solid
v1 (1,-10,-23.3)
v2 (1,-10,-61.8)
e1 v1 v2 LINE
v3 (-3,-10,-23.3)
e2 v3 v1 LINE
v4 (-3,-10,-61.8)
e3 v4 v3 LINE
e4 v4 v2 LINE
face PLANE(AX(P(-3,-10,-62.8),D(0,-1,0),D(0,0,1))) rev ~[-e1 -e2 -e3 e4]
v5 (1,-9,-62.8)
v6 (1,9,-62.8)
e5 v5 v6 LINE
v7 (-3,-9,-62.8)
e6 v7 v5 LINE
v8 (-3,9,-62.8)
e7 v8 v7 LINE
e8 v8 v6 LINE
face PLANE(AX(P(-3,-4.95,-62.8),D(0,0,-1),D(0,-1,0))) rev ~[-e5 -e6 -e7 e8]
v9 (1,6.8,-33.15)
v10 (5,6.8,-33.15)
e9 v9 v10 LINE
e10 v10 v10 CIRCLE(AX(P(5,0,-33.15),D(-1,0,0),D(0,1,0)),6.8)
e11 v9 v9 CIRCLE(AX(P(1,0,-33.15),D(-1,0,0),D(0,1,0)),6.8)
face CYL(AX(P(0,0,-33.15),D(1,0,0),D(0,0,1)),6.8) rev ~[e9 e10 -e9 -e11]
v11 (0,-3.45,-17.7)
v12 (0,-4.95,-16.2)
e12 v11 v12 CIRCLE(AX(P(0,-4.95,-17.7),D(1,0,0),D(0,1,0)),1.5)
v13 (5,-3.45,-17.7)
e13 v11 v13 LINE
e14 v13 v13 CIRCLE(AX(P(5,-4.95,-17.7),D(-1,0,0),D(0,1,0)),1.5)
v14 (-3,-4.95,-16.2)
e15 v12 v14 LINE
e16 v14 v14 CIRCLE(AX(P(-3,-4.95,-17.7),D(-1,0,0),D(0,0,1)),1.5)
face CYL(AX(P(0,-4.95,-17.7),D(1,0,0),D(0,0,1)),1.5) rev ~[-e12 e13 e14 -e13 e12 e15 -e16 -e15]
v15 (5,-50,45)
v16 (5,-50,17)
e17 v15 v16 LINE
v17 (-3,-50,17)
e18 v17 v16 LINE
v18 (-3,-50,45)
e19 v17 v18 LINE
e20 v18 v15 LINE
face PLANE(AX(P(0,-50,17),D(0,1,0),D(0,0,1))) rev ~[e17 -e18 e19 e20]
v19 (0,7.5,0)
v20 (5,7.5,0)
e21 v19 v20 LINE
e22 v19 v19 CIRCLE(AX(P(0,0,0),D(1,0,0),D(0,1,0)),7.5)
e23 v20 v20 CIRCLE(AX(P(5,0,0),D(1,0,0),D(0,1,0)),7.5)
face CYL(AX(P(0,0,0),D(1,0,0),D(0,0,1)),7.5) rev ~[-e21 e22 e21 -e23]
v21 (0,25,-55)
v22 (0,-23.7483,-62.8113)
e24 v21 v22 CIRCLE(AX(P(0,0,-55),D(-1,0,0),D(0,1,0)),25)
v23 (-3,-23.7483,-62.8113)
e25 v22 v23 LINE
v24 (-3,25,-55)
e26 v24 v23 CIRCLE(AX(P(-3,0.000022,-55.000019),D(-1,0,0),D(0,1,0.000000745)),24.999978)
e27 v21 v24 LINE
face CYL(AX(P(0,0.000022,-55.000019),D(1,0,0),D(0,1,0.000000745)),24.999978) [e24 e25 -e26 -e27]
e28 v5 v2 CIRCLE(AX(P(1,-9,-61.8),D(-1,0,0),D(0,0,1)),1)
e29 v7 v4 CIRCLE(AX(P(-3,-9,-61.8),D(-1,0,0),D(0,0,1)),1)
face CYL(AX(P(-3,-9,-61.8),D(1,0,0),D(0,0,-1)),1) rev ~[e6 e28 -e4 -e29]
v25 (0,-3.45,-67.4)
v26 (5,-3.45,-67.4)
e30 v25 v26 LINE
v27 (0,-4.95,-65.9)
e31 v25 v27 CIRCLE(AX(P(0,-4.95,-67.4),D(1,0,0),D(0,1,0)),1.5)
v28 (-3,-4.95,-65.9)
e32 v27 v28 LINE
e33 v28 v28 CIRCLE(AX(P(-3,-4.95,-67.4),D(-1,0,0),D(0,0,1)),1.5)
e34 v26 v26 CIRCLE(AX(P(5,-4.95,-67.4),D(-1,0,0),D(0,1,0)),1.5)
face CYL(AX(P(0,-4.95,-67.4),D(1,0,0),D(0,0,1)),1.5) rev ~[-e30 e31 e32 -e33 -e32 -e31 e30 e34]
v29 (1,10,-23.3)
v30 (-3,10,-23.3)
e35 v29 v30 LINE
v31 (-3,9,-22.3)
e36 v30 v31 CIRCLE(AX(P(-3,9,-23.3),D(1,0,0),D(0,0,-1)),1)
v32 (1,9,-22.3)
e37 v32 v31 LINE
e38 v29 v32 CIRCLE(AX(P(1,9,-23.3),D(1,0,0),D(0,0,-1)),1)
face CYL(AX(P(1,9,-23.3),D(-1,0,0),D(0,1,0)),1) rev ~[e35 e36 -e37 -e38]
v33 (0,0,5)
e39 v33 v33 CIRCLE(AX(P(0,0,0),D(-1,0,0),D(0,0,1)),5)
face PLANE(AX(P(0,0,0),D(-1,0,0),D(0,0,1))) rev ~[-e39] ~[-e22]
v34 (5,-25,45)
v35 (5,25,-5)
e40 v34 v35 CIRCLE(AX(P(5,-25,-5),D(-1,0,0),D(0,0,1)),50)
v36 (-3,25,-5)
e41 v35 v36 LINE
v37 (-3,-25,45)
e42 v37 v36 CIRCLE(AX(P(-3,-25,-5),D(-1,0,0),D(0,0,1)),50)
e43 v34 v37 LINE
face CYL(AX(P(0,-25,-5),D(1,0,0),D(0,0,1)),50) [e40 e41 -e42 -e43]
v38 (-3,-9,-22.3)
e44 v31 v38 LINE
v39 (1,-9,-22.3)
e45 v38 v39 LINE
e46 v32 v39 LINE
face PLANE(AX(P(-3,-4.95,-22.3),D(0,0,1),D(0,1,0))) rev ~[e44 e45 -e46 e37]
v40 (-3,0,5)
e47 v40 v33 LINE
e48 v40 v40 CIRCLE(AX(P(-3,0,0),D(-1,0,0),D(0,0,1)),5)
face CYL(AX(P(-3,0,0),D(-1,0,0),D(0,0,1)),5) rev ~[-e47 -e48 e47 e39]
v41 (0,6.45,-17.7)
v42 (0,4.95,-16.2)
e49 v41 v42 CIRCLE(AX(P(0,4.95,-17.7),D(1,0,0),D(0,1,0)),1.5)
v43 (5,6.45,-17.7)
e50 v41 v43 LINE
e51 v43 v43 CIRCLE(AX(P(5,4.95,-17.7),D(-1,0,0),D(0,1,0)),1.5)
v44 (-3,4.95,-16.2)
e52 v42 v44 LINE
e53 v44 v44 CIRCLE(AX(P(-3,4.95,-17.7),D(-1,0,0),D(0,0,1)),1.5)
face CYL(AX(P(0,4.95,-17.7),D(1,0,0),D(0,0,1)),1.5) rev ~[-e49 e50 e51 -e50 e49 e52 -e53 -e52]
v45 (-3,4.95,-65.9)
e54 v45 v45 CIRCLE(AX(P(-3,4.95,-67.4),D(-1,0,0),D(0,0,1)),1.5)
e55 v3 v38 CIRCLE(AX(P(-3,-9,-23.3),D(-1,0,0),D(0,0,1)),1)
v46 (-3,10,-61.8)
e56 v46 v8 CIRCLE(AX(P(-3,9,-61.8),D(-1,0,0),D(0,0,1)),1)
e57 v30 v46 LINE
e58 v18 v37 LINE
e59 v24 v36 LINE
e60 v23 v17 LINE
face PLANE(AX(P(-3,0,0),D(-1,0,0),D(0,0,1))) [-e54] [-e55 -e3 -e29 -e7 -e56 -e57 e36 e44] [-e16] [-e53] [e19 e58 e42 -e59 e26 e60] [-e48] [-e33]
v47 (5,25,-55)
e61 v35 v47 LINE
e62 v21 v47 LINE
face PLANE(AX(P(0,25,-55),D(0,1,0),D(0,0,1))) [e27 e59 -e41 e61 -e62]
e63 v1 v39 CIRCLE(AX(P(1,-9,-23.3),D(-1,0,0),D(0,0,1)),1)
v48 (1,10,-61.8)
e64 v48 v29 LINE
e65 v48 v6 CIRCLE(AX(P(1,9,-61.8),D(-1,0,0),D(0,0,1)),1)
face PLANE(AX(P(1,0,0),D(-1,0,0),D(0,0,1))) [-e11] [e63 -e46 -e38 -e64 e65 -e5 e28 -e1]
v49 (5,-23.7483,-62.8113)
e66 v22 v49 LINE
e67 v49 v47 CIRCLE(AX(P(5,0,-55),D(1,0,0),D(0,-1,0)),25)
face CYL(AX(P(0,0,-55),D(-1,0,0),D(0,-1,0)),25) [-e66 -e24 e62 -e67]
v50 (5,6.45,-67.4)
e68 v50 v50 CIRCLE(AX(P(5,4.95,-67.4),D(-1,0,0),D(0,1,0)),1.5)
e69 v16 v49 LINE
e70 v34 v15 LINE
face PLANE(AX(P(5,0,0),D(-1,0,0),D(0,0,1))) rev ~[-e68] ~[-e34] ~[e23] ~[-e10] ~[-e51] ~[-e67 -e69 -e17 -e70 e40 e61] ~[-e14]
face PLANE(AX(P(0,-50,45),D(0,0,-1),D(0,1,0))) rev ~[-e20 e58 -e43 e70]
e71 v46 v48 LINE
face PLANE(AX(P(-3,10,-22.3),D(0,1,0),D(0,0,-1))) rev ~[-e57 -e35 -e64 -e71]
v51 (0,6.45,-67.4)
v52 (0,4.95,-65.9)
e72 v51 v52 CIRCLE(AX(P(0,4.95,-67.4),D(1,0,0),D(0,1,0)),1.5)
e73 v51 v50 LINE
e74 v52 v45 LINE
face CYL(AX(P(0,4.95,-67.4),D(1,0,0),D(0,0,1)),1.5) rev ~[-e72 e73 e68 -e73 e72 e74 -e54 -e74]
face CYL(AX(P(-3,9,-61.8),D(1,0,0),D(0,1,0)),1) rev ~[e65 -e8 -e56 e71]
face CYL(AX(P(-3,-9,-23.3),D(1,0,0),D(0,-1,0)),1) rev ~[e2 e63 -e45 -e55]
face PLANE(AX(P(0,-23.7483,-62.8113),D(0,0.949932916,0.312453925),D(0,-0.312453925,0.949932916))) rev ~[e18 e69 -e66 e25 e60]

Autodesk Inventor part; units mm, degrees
ref_plane "YZ Plane" through (0, 0, 0) normal (1, 0, 0) x (0, 1, 0)
ref_plane "XZ Plane" through (0, 0, 0) normal (0, 1, 0) x (-1, 0, 0)
ref_plane "XY Plane" through (0, 0, 0) normal (0, 0, 1) x (1, 0, 0)
sketch "Sketch1" plane through (0, 0, 0) normal (1, 0, 0) x (0, 1, 0)
  circle A0 centre (0, 0) radius 16.575
  line L0 (0, 16.575) -> (0, -49.725)
  line L1 (0, -33.15) -> (0, -15.05)
  line L2 (0, -15.05) -> (0, -70.05)
  line L3 (10, -70.05) -> (-10, -70.05)
  line L4 (-10, -70.05) -> (-10, -15.05)
  line L5 (-10, -15.05) -> (10, -15.05)
  line L6 (10, -15.05) -> (10, -70.05)
  line L7 (10, -70.05) -> (-10, -15.05) construction
  line L8 (-10, -70.05) -> (10, -15.05) construction
  line L9 (10, -62.65) -> (-10, -62.65)
  line L10 (-10, -62.65) -> (-10, -22.45)
  line L11 (-10, -22.45) -> (10, -22.45)
  line L12 (10, -22.45) -> (10, -62.65)
  line L13 (10, -62.65) -> (-10, -22.45) construction
  line L14 (-10, -62.65) -> (10, -22.45) construction
  line L15 (-4.95, -27.2) -> (-4.95, -17.7)
  line L16 (-4.95, -17.7) -> (4.95, -17.7)
  line L17 (4.95, -27.2) -> (-4.95, -17.7) construction
  line L18 (-4.95, -27.2) -> (4.95, -17.7) construction
  line L19 (4.95, -67.4) -> (-4.95, -67.4)
  line L20 (-4.95, -67.4) -> (-4.95, -57.9)
  line L21 (-4.95, -57.9) -> (4.95, -57.9)
  line L22 (4.95, -67.4) -> (-4.95, -57.9) construction
  line L23 (-4.95, -67.4) -> (4.95, -57.9) construction
  circle A1 centre (4.95, -17.7) radius 1.5
  circle A2 centre (-4.95, -17.7) radius 1.5
  circle A3 centre (4.95, -67.4) radius 1.5
  circle A4 centre (-4.95, -67.4) radius 1.5
  circle A5 centre (0, -33.15) radius 6.8
  line L24 (0, -80) -> (0, -55)
  arc A6 (-25, -55) -> (25, -55) centre (0, -55) ccw
  line L25 (0, 0) -> (0, 45)
  line L26 (25, 45) -> (-25, 45)
  line L27 (25, 45) -> (25, -55)
  line L28 (-25, 45) -> (-25, -55)
  circle A7 centre (0, 0) radius 7.5
  point P0 (0, -42.55)
  point P1 (0, -42.55)
  point P2 (0, -22.45)
  point P3 (0, -62.65)
  dimension "d0" = 33.15
  dimension "d2" = 66.3
  dimension "d4" = 18.1
  dimension "d5" = 55
  dimension "d6" = 20
  dimension "d7" = 55
  dimension "d8" = 40.2
  dimension "d9" = 9.9
  dimension "d10" = 9.5
  dimension "d11" = 9.9
  dimension "d12" = 9.5
  dimension "d13" = 3
  dimension "d14" = 3
  dimension "d15" = 3
  dimension "d16" = 3
  dimension "d17" = 13.6
  dimension "d20" = 25
  dimension "d21" = 45
  dimension "d22" = 15
extrude "Extrusion1" add sketch "Sketch1" along normal blind 5 contours A0 L5 L0 A7 | A0 L25 L26 L27 A6 L24 L3 L6 L5 | L0 A7 L5 A0 | A0 L5 L4 L3 L24 A6 L28 L26 L25 | L5 L6 L11 L0 A0 | A0 L0 L5 | L5 L0 A0 | A0 L0 L16 A2 L15 L11 L4 L5 | L0 L11 L15 A2 L16 | L6 L9 L2 L0 A5 L11 | L11 L0 A5 L2 L21 L20 L9 L4 | L6 L3 L2 L9 | L9 L20 A4 L19 L2 L3 L4 | L9 L20 L21 L2 | L2 L19 A4 L20 L9
sketch "Sketch2" plane through (0, 0, 0) normal (-1, 0, 0) x (0, 0, 1)
  line L0 (45, 25) -> (45, -25) projected
  line L1 (-55, 25) -> (45, 25) projected
  line L2 (45, 25) -> (-5, 25)
  line L3 (45, 25) -> (45, -25)
  arc A0 (45, -25) -> (-5, 25) centre (-5, -25) ccw
extrude "Extrusion2" cut sketch "Sketch2" against normal blind 5
sketch "Sketch3" plane through (0, 0, 0) normal (-1, 0, 0) x (0, 0, 1)
  arc A0 (45, -25) -> (-5, 25) centre (-5, -25) ccw projected
  arc A1 (-55, 25) -> (-55, -25) centre (-55, 0) ccw projected
  line L0 (45, -25) -> (-55, -25) projected
  line L1 (45, -25) -> (45, -50)
  line L2 (45, -50) -> (17, -50)
  line L3 (17, -50) -> (-62.8113, -23.7483)
  line L4 (45, -25) -> (-55, -25)
  arc A2 (-62.8113, -23.7483) -> (-55, -25) centre (-55, 0) ccw
  dimension "d27" = 25
  dimension "d28" = 28
extrude "Extrusion3" add sketch "Sketch3" against normal blind 5
sketch "Sketch4" plane through (0, 0, 0) normal (-1, 0, 0) x (0, 0, 1)
  circle A0 centre (0, 0) radius 7.5 projected
  arc A1 (45, -25) -> (-5, 25) centre (-5, -25) ccw projected
  line L0 (-55, 25) -> (-5, 25) projected
  arc A2 (-55, 25) -> (-62.8113, -23.7483) centre (-55, 0) ccw projected
  line L1 (-62.8113, -23.7483) -> (17, -50) projected
  line L2 (17, -50) -> (45, -50) projected
  line L3 (45, -50) -> (45, -25) projected
  circle A3 centre (-33.15, 0) radius 6.8 projected
  circle A4 centre (-67.4, -4.95) radius 1.5 projected
  circle A5 centre (-67.4, 4.95) radius 1.5 projected
  circle A6 centre (-17.7, -4.95) radius 1.5 projected
  circle A7 centre (-17.7, 4.95) radius 1.5 projected
extrude "Extrusion4" add sketch "Sketch4" along normal blind 3
sketch "Sketch5" plane through (-3, 0, 0) normal (-1, 0, 0) x (0, 0, 1)
  circle A0 centre (-33.15, 0) radius 6.8 projected
  circle A1 centre (-17.7, -4.95) radius 1.5 projected
  circle A2 centre (-67.4, 4.95) radius 1.5 projected
  line L0 (-67.4, 4.95) -> (-17.7, 4.95)
  line L1 (-17.7, 4.95) -> (-17.7, -4.95)
  line L2 (-17.7, -4.95) -> (-67.4, -4.95)
  line L3 (-67.4, -4.95) -> (-67.4, 4.95)
  line L4 (-67.4, 0) -> (-17.7, 0)
  line L5 (-22.3, 10) -> (-62.8, 10)
  line L6 (-62.8, 10) -> (-62.8, -10)
  line L7 (-62.8, -10) -> (-22.3, -10)
  line L8 (-22.3, -10) -> (-22.3, 10)
  line L9 (-22.3, 10) -> (-62.8, -10) construction
  line L10 (-62.8, 10) -> (-22.3, -10) construction
  point P0 (-42.55, 0)
  dimension "d33" = 40.5
  dimension "d34" = 20
extrude "Extrusion5" cut sketch "Sketch5" against normal blind 3 contours L4 L8 L2 A0 | A0 L0 L8 L4 | A0 L0 L6 L5 L8 | L2 L8 L7 L6 A0 | L4 L6 L0 A0 | A0 L2 L6 L4
sketch "Sketch6" plane through (0, 0, 0) normal (-1, 0, 0) x (0, 0, 1)
  circle A0 centre (-33.15, 0) radius 6.8 projected
  line L0 (-62.8, 10) -> (-22.3, 10) projected
  line L1 (-62.8, -10) -> (-62.8, 10) projected
  line L2 (-22.3, -10) -> (-62.8, -10) projected
  line L3 (-22.3, 10) -> (-22.3, -10) projected
  point P0 (0, 0)
extrude "Extrusion6" cut sketch "Sketch6" against normal blind 1
sketch "Sketch7" plane through (-3, 0, 0) normal (-1, 0, 0) x (0, 0, 1)
  circle A0 centre (0, 0) radius 7.5 projected
  circle A1 centre (0, 0) radius 5
  dimension "d39" = 10
extrude "Extrusion7" add sketch "Sketch7" against normal blind 3
fillet "Fillet1" radius 1 4 edges at (-1, -10, -22.3) (-1, 10, -22.3) (-1, 10, -62.8) (-1, -10, -62.8)
properties part number "packa_strana(a)"
